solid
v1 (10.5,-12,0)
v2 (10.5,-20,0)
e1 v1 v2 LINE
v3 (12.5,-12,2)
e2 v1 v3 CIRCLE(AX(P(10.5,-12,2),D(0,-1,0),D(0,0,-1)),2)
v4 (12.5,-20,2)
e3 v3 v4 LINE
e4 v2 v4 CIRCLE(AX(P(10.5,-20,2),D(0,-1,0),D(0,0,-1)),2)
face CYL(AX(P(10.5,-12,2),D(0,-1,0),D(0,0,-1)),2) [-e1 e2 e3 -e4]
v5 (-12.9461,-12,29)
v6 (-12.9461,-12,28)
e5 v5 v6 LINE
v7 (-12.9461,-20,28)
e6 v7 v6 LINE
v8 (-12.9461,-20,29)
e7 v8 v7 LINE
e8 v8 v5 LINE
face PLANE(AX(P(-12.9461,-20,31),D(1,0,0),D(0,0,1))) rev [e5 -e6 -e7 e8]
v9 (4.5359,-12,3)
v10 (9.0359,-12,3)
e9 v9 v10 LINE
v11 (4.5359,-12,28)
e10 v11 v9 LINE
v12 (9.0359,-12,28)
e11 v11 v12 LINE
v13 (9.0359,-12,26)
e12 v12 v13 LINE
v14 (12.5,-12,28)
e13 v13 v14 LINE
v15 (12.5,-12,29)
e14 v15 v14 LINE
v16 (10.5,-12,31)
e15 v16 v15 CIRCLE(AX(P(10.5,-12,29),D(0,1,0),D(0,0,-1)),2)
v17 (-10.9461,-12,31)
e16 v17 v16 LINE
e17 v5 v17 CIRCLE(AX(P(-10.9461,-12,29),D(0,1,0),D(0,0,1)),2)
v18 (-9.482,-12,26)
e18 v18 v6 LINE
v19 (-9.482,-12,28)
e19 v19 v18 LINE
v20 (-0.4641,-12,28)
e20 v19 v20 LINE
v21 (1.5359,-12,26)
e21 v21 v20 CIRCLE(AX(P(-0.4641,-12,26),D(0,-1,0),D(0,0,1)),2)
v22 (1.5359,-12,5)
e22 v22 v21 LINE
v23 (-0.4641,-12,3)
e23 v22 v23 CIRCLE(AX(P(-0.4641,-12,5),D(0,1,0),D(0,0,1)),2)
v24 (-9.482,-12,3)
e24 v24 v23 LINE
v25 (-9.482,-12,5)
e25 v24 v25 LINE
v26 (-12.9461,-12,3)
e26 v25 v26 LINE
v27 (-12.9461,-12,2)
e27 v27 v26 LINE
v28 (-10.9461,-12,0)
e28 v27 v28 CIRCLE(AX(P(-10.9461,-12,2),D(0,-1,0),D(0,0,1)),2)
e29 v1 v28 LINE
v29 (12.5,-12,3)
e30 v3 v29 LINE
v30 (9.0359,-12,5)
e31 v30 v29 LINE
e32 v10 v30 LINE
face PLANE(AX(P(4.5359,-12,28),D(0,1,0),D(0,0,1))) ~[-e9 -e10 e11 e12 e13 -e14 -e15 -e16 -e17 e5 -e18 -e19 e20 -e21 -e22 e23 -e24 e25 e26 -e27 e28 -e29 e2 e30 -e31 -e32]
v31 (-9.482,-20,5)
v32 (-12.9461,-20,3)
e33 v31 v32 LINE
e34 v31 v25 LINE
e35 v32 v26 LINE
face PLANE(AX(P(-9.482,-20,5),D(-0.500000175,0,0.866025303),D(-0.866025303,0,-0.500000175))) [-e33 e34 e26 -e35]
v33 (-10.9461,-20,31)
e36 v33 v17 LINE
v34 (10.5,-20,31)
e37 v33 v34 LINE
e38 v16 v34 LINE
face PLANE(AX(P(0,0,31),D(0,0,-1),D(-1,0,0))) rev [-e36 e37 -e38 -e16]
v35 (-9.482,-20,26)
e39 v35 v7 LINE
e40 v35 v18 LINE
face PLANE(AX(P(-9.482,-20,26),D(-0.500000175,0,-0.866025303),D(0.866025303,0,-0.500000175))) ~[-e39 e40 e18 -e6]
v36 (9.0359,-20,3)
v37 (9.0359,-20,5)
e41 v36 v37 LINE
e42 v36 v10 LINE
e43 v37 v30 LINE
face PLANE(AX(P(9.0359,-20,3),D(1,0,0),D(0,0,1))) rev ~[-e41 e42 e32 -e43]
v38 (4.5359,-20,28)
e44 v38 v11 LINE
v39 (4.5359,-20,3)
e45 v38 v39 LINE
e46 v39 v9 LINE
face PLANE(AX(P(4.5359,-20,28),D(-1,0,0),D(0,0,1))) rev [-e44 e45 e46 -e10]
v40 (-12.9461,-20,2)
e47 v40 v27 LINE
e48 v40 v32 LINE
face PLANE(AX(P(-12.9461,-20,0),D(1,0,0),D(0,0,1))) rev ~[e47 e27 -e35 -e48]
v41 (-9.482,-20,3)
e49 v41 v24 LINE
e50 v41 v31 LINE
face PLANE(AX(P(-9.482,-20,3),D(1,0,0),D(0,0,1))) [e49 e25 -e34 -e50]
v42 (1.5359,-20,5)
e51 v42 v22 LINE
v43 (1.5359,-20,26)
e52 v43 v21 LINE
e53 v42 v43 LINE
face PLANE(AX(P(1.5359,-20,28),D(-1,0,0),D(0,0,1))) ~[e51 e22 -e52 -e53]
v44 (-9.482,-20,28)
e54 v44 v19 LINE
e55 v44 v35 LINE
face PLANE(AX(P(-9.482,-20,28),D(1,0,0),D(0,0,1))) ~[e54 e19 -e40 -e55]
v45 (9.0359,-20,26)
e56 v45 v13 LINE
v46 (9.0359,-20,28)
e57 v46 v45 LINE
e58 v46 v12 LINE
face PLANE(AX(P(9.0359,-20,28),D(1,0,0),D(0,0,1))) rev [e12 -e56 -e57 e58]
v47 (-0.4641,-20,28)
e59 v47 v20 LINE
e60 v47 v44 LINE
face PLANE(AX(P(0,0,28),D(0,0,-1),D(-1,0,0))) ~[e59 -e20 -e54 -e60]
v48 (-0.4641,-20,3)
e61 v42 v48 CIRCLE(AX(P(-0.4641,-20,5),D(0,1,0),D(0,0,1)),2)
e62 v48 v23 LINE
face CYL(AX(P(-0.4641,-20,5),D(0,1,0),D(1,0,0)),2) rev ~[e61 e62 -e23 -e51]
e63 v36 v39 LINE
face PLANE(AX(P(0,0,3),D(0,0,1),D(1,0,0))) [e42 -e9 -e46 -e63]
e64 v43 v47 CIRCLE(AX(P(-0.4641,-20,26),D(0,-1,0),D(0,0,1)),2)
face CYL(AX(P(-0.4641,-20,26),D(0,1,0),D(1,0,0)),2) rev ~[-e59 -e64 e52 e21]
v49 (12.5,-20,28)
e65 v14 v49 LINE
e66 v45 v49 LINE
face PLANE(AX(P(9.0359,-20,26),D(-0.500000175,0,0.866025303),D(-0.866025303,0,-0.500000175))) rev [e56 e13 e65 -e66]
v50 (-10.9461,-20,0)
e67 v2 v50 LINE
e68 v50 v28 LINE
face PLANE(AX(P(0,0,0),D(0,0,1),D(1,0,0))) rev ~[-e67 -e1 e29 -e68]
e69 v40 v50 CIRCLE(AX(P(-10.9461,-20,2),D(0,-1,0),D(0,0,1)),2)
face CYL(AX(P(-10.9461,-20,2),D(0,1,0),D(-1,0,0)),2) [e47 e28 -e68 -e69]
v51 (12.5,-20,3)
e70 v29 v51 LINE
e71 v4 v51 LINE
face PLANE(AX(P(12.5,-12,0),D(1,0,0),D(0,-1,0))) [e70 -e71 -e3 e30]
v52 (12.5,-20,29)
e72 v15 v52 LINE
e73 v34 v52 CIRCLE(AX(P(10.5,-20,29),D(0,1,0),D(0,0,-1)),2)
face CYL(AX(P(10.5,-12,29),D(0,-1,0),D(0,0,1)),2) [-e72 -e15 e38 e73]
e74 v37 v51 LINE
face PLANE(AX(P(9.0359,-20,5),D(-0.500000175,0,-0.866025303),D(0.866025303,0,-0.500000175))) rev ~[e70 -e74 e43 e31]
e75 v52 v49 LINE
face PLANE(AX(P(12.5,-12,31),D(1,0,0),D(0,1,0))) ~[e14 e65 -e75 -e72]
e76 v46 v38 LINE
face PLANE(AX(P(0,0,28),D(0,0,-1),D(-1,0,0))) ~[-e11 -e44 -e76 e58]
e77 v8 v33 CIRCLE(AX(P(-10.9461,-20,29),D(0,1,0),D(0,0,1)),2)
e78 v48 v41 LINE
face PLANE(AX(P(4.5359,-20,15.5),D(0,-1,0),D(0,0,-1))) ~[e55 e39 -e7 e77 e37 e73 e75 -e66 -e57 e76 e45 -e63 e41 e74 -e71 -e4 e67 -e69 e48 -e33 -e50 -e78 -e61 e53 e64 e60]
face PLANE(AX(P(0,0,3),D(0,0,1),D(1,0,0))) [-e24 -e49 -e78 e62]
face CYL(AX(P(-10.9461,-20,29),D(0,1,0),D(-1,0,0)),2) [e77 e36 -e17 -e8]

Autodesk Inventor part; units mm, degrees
ref_plane "YZ Plane" through (0, 0, 0) normal (1, 0, 0) x (0, 1, 0)
sketch "Sketch1" plane through (0, 0, 0) normal (0, 0, 1) x (1, 0, 0)
  line L0 (-12.5, -12) -> (12.5, -12)
  line L1 (12.5, -12) -> (12.5, -20)
  line L2 (12.5, -20) -> (-12.5, -20)
  line L3 (-12.5, -20) -> (-12.5, -12)
  point P0 (0, 0)
  dimension "d0" = 25
  dimension "d1" = 8
  dimension "d2" = 12.5
  dimension "d3" = 20
extrude "Extrusion1" add sketch "Sketch1" along normal blind 3
sketch "Sketch3" plane through (-12.5, -20, 0) normal (0, -1, 0) x (1, 0, 0)
  line L0 (25, 3) -> (0, 3) projected
  line L1 (25, 0) -> (25, 3) projected
  line L2 (21.5359, 3) -> (21.5359, 5)
  line L3 (25, 3) -> (21.5359, 3)
  line L4 (25, 0) -> (0, 0) projected
  line L5 (21.5359, 5) -> (25, 3)
  point P0 (12.5, 0)
  dimension "d9" = 2
  dimension "d11" = 0
  dimension "d15" = 30
extrude "Extrusion2" add sketch "Sketch3" against normal blind 8
ref_plane "Work Plane1" through (4.5359, -20, 3) normal (-1, 0, 0) x (0, 0, 1)
sketch "Sketch4" plane through (4.5359, -20, 3) normal (-1, 0, 0) x (0, 0, 1)
  line L0 (0, 8) -> (12.5, 8)
  line L1 (12.5, 8) -> (12.5, 0)
  line L2 (12.5, 0) -> (0, 0)
  line L3 (0, 0) -> (0, 8)
  point P0 (-3, 20)
  dimension "d16" = 12.5
  dimension "d17" = 8
  dimension "d18" = 12
  dimension "d19" = 3
extrude "Extrusion3" add sketch "Sketch4" along normal blind 3
ref_plane "Work Plane2" through (-9.4641, -20, 3) normal (-1, 0, 0) x (0, 0, 1)
sketch "Sketch5" plane through (-12.5, -20, 0) normal (0, -1, 0) x (1, 0, 0)
  line L0 (21.5359, 3) -> (17.0359, 3) projected
  line L1 (17.0359, 15.5) -> (17.0359, 3) projected
  line L2 (17.0359, 15.5) -> (14.0359, 15.5) projected
  line L3 (14.0359, 15.5) -> (14.0359, 3) projected
  line L4 (14.0359, 3) -> (0, 3) projected
  line L5 (0, 0) -> (0, 3) projected
  line L6 (25, 0) -> (0, 0) projected
  line L7 (25, 0) -> (25, 3) projected
  line L8 (21.5359, 5) -> (25, 3) projected
  line L9 (21.5359, 3) -> (21.5359, 5) projected
  line L10 (3.018, 3) -> (3.018, 5)
  line L11 (3.018, 5) -> (-0.4461, 3)
  line L12 (-0.4461, 3) -> (3.018, 3)
  line L13 (-0.4461, 3) -> (0, 3)
  line L14 (0, 3) -> (0, 0)
  line L15 (0, 0) -> (-0.4461, 0)
  line L16 (-0.4461, 0) -> (-0.4461, 3)
  point P0 (12.5, 0)
  dimension "d23" = 2
  dimension "d24" = 60
extrude "Extrusion4" add sketch "Sketch5" against normal blind 8
mirror "Mirror1" about plane through (4.5359, -12, 15.5) normal (0, 0, 1) of "Extrusion1", "Extrusion2", "Extrusion3", "Extrusion4"
fillet "Fillet1" radius 2 2 edges at (1.5359, -16, 28) (1.5359, -16, 3)
fillet "Fillet2" radius 2 4 edges at (-12.9461, -16, 31) (-12.9461, -16, 0) (12.5, -16, 31) (12.5, -16, 0)
ref_plane "Work Plane3" through (4.5359, -20, 28) normal (1, 0, 0) x (0, 0, -1)
ref_plane "Work Plane4" through (-9.4641, -20, 28) normal (1, 0, 0) x (0, 0, -1)
properties part number "claw"
